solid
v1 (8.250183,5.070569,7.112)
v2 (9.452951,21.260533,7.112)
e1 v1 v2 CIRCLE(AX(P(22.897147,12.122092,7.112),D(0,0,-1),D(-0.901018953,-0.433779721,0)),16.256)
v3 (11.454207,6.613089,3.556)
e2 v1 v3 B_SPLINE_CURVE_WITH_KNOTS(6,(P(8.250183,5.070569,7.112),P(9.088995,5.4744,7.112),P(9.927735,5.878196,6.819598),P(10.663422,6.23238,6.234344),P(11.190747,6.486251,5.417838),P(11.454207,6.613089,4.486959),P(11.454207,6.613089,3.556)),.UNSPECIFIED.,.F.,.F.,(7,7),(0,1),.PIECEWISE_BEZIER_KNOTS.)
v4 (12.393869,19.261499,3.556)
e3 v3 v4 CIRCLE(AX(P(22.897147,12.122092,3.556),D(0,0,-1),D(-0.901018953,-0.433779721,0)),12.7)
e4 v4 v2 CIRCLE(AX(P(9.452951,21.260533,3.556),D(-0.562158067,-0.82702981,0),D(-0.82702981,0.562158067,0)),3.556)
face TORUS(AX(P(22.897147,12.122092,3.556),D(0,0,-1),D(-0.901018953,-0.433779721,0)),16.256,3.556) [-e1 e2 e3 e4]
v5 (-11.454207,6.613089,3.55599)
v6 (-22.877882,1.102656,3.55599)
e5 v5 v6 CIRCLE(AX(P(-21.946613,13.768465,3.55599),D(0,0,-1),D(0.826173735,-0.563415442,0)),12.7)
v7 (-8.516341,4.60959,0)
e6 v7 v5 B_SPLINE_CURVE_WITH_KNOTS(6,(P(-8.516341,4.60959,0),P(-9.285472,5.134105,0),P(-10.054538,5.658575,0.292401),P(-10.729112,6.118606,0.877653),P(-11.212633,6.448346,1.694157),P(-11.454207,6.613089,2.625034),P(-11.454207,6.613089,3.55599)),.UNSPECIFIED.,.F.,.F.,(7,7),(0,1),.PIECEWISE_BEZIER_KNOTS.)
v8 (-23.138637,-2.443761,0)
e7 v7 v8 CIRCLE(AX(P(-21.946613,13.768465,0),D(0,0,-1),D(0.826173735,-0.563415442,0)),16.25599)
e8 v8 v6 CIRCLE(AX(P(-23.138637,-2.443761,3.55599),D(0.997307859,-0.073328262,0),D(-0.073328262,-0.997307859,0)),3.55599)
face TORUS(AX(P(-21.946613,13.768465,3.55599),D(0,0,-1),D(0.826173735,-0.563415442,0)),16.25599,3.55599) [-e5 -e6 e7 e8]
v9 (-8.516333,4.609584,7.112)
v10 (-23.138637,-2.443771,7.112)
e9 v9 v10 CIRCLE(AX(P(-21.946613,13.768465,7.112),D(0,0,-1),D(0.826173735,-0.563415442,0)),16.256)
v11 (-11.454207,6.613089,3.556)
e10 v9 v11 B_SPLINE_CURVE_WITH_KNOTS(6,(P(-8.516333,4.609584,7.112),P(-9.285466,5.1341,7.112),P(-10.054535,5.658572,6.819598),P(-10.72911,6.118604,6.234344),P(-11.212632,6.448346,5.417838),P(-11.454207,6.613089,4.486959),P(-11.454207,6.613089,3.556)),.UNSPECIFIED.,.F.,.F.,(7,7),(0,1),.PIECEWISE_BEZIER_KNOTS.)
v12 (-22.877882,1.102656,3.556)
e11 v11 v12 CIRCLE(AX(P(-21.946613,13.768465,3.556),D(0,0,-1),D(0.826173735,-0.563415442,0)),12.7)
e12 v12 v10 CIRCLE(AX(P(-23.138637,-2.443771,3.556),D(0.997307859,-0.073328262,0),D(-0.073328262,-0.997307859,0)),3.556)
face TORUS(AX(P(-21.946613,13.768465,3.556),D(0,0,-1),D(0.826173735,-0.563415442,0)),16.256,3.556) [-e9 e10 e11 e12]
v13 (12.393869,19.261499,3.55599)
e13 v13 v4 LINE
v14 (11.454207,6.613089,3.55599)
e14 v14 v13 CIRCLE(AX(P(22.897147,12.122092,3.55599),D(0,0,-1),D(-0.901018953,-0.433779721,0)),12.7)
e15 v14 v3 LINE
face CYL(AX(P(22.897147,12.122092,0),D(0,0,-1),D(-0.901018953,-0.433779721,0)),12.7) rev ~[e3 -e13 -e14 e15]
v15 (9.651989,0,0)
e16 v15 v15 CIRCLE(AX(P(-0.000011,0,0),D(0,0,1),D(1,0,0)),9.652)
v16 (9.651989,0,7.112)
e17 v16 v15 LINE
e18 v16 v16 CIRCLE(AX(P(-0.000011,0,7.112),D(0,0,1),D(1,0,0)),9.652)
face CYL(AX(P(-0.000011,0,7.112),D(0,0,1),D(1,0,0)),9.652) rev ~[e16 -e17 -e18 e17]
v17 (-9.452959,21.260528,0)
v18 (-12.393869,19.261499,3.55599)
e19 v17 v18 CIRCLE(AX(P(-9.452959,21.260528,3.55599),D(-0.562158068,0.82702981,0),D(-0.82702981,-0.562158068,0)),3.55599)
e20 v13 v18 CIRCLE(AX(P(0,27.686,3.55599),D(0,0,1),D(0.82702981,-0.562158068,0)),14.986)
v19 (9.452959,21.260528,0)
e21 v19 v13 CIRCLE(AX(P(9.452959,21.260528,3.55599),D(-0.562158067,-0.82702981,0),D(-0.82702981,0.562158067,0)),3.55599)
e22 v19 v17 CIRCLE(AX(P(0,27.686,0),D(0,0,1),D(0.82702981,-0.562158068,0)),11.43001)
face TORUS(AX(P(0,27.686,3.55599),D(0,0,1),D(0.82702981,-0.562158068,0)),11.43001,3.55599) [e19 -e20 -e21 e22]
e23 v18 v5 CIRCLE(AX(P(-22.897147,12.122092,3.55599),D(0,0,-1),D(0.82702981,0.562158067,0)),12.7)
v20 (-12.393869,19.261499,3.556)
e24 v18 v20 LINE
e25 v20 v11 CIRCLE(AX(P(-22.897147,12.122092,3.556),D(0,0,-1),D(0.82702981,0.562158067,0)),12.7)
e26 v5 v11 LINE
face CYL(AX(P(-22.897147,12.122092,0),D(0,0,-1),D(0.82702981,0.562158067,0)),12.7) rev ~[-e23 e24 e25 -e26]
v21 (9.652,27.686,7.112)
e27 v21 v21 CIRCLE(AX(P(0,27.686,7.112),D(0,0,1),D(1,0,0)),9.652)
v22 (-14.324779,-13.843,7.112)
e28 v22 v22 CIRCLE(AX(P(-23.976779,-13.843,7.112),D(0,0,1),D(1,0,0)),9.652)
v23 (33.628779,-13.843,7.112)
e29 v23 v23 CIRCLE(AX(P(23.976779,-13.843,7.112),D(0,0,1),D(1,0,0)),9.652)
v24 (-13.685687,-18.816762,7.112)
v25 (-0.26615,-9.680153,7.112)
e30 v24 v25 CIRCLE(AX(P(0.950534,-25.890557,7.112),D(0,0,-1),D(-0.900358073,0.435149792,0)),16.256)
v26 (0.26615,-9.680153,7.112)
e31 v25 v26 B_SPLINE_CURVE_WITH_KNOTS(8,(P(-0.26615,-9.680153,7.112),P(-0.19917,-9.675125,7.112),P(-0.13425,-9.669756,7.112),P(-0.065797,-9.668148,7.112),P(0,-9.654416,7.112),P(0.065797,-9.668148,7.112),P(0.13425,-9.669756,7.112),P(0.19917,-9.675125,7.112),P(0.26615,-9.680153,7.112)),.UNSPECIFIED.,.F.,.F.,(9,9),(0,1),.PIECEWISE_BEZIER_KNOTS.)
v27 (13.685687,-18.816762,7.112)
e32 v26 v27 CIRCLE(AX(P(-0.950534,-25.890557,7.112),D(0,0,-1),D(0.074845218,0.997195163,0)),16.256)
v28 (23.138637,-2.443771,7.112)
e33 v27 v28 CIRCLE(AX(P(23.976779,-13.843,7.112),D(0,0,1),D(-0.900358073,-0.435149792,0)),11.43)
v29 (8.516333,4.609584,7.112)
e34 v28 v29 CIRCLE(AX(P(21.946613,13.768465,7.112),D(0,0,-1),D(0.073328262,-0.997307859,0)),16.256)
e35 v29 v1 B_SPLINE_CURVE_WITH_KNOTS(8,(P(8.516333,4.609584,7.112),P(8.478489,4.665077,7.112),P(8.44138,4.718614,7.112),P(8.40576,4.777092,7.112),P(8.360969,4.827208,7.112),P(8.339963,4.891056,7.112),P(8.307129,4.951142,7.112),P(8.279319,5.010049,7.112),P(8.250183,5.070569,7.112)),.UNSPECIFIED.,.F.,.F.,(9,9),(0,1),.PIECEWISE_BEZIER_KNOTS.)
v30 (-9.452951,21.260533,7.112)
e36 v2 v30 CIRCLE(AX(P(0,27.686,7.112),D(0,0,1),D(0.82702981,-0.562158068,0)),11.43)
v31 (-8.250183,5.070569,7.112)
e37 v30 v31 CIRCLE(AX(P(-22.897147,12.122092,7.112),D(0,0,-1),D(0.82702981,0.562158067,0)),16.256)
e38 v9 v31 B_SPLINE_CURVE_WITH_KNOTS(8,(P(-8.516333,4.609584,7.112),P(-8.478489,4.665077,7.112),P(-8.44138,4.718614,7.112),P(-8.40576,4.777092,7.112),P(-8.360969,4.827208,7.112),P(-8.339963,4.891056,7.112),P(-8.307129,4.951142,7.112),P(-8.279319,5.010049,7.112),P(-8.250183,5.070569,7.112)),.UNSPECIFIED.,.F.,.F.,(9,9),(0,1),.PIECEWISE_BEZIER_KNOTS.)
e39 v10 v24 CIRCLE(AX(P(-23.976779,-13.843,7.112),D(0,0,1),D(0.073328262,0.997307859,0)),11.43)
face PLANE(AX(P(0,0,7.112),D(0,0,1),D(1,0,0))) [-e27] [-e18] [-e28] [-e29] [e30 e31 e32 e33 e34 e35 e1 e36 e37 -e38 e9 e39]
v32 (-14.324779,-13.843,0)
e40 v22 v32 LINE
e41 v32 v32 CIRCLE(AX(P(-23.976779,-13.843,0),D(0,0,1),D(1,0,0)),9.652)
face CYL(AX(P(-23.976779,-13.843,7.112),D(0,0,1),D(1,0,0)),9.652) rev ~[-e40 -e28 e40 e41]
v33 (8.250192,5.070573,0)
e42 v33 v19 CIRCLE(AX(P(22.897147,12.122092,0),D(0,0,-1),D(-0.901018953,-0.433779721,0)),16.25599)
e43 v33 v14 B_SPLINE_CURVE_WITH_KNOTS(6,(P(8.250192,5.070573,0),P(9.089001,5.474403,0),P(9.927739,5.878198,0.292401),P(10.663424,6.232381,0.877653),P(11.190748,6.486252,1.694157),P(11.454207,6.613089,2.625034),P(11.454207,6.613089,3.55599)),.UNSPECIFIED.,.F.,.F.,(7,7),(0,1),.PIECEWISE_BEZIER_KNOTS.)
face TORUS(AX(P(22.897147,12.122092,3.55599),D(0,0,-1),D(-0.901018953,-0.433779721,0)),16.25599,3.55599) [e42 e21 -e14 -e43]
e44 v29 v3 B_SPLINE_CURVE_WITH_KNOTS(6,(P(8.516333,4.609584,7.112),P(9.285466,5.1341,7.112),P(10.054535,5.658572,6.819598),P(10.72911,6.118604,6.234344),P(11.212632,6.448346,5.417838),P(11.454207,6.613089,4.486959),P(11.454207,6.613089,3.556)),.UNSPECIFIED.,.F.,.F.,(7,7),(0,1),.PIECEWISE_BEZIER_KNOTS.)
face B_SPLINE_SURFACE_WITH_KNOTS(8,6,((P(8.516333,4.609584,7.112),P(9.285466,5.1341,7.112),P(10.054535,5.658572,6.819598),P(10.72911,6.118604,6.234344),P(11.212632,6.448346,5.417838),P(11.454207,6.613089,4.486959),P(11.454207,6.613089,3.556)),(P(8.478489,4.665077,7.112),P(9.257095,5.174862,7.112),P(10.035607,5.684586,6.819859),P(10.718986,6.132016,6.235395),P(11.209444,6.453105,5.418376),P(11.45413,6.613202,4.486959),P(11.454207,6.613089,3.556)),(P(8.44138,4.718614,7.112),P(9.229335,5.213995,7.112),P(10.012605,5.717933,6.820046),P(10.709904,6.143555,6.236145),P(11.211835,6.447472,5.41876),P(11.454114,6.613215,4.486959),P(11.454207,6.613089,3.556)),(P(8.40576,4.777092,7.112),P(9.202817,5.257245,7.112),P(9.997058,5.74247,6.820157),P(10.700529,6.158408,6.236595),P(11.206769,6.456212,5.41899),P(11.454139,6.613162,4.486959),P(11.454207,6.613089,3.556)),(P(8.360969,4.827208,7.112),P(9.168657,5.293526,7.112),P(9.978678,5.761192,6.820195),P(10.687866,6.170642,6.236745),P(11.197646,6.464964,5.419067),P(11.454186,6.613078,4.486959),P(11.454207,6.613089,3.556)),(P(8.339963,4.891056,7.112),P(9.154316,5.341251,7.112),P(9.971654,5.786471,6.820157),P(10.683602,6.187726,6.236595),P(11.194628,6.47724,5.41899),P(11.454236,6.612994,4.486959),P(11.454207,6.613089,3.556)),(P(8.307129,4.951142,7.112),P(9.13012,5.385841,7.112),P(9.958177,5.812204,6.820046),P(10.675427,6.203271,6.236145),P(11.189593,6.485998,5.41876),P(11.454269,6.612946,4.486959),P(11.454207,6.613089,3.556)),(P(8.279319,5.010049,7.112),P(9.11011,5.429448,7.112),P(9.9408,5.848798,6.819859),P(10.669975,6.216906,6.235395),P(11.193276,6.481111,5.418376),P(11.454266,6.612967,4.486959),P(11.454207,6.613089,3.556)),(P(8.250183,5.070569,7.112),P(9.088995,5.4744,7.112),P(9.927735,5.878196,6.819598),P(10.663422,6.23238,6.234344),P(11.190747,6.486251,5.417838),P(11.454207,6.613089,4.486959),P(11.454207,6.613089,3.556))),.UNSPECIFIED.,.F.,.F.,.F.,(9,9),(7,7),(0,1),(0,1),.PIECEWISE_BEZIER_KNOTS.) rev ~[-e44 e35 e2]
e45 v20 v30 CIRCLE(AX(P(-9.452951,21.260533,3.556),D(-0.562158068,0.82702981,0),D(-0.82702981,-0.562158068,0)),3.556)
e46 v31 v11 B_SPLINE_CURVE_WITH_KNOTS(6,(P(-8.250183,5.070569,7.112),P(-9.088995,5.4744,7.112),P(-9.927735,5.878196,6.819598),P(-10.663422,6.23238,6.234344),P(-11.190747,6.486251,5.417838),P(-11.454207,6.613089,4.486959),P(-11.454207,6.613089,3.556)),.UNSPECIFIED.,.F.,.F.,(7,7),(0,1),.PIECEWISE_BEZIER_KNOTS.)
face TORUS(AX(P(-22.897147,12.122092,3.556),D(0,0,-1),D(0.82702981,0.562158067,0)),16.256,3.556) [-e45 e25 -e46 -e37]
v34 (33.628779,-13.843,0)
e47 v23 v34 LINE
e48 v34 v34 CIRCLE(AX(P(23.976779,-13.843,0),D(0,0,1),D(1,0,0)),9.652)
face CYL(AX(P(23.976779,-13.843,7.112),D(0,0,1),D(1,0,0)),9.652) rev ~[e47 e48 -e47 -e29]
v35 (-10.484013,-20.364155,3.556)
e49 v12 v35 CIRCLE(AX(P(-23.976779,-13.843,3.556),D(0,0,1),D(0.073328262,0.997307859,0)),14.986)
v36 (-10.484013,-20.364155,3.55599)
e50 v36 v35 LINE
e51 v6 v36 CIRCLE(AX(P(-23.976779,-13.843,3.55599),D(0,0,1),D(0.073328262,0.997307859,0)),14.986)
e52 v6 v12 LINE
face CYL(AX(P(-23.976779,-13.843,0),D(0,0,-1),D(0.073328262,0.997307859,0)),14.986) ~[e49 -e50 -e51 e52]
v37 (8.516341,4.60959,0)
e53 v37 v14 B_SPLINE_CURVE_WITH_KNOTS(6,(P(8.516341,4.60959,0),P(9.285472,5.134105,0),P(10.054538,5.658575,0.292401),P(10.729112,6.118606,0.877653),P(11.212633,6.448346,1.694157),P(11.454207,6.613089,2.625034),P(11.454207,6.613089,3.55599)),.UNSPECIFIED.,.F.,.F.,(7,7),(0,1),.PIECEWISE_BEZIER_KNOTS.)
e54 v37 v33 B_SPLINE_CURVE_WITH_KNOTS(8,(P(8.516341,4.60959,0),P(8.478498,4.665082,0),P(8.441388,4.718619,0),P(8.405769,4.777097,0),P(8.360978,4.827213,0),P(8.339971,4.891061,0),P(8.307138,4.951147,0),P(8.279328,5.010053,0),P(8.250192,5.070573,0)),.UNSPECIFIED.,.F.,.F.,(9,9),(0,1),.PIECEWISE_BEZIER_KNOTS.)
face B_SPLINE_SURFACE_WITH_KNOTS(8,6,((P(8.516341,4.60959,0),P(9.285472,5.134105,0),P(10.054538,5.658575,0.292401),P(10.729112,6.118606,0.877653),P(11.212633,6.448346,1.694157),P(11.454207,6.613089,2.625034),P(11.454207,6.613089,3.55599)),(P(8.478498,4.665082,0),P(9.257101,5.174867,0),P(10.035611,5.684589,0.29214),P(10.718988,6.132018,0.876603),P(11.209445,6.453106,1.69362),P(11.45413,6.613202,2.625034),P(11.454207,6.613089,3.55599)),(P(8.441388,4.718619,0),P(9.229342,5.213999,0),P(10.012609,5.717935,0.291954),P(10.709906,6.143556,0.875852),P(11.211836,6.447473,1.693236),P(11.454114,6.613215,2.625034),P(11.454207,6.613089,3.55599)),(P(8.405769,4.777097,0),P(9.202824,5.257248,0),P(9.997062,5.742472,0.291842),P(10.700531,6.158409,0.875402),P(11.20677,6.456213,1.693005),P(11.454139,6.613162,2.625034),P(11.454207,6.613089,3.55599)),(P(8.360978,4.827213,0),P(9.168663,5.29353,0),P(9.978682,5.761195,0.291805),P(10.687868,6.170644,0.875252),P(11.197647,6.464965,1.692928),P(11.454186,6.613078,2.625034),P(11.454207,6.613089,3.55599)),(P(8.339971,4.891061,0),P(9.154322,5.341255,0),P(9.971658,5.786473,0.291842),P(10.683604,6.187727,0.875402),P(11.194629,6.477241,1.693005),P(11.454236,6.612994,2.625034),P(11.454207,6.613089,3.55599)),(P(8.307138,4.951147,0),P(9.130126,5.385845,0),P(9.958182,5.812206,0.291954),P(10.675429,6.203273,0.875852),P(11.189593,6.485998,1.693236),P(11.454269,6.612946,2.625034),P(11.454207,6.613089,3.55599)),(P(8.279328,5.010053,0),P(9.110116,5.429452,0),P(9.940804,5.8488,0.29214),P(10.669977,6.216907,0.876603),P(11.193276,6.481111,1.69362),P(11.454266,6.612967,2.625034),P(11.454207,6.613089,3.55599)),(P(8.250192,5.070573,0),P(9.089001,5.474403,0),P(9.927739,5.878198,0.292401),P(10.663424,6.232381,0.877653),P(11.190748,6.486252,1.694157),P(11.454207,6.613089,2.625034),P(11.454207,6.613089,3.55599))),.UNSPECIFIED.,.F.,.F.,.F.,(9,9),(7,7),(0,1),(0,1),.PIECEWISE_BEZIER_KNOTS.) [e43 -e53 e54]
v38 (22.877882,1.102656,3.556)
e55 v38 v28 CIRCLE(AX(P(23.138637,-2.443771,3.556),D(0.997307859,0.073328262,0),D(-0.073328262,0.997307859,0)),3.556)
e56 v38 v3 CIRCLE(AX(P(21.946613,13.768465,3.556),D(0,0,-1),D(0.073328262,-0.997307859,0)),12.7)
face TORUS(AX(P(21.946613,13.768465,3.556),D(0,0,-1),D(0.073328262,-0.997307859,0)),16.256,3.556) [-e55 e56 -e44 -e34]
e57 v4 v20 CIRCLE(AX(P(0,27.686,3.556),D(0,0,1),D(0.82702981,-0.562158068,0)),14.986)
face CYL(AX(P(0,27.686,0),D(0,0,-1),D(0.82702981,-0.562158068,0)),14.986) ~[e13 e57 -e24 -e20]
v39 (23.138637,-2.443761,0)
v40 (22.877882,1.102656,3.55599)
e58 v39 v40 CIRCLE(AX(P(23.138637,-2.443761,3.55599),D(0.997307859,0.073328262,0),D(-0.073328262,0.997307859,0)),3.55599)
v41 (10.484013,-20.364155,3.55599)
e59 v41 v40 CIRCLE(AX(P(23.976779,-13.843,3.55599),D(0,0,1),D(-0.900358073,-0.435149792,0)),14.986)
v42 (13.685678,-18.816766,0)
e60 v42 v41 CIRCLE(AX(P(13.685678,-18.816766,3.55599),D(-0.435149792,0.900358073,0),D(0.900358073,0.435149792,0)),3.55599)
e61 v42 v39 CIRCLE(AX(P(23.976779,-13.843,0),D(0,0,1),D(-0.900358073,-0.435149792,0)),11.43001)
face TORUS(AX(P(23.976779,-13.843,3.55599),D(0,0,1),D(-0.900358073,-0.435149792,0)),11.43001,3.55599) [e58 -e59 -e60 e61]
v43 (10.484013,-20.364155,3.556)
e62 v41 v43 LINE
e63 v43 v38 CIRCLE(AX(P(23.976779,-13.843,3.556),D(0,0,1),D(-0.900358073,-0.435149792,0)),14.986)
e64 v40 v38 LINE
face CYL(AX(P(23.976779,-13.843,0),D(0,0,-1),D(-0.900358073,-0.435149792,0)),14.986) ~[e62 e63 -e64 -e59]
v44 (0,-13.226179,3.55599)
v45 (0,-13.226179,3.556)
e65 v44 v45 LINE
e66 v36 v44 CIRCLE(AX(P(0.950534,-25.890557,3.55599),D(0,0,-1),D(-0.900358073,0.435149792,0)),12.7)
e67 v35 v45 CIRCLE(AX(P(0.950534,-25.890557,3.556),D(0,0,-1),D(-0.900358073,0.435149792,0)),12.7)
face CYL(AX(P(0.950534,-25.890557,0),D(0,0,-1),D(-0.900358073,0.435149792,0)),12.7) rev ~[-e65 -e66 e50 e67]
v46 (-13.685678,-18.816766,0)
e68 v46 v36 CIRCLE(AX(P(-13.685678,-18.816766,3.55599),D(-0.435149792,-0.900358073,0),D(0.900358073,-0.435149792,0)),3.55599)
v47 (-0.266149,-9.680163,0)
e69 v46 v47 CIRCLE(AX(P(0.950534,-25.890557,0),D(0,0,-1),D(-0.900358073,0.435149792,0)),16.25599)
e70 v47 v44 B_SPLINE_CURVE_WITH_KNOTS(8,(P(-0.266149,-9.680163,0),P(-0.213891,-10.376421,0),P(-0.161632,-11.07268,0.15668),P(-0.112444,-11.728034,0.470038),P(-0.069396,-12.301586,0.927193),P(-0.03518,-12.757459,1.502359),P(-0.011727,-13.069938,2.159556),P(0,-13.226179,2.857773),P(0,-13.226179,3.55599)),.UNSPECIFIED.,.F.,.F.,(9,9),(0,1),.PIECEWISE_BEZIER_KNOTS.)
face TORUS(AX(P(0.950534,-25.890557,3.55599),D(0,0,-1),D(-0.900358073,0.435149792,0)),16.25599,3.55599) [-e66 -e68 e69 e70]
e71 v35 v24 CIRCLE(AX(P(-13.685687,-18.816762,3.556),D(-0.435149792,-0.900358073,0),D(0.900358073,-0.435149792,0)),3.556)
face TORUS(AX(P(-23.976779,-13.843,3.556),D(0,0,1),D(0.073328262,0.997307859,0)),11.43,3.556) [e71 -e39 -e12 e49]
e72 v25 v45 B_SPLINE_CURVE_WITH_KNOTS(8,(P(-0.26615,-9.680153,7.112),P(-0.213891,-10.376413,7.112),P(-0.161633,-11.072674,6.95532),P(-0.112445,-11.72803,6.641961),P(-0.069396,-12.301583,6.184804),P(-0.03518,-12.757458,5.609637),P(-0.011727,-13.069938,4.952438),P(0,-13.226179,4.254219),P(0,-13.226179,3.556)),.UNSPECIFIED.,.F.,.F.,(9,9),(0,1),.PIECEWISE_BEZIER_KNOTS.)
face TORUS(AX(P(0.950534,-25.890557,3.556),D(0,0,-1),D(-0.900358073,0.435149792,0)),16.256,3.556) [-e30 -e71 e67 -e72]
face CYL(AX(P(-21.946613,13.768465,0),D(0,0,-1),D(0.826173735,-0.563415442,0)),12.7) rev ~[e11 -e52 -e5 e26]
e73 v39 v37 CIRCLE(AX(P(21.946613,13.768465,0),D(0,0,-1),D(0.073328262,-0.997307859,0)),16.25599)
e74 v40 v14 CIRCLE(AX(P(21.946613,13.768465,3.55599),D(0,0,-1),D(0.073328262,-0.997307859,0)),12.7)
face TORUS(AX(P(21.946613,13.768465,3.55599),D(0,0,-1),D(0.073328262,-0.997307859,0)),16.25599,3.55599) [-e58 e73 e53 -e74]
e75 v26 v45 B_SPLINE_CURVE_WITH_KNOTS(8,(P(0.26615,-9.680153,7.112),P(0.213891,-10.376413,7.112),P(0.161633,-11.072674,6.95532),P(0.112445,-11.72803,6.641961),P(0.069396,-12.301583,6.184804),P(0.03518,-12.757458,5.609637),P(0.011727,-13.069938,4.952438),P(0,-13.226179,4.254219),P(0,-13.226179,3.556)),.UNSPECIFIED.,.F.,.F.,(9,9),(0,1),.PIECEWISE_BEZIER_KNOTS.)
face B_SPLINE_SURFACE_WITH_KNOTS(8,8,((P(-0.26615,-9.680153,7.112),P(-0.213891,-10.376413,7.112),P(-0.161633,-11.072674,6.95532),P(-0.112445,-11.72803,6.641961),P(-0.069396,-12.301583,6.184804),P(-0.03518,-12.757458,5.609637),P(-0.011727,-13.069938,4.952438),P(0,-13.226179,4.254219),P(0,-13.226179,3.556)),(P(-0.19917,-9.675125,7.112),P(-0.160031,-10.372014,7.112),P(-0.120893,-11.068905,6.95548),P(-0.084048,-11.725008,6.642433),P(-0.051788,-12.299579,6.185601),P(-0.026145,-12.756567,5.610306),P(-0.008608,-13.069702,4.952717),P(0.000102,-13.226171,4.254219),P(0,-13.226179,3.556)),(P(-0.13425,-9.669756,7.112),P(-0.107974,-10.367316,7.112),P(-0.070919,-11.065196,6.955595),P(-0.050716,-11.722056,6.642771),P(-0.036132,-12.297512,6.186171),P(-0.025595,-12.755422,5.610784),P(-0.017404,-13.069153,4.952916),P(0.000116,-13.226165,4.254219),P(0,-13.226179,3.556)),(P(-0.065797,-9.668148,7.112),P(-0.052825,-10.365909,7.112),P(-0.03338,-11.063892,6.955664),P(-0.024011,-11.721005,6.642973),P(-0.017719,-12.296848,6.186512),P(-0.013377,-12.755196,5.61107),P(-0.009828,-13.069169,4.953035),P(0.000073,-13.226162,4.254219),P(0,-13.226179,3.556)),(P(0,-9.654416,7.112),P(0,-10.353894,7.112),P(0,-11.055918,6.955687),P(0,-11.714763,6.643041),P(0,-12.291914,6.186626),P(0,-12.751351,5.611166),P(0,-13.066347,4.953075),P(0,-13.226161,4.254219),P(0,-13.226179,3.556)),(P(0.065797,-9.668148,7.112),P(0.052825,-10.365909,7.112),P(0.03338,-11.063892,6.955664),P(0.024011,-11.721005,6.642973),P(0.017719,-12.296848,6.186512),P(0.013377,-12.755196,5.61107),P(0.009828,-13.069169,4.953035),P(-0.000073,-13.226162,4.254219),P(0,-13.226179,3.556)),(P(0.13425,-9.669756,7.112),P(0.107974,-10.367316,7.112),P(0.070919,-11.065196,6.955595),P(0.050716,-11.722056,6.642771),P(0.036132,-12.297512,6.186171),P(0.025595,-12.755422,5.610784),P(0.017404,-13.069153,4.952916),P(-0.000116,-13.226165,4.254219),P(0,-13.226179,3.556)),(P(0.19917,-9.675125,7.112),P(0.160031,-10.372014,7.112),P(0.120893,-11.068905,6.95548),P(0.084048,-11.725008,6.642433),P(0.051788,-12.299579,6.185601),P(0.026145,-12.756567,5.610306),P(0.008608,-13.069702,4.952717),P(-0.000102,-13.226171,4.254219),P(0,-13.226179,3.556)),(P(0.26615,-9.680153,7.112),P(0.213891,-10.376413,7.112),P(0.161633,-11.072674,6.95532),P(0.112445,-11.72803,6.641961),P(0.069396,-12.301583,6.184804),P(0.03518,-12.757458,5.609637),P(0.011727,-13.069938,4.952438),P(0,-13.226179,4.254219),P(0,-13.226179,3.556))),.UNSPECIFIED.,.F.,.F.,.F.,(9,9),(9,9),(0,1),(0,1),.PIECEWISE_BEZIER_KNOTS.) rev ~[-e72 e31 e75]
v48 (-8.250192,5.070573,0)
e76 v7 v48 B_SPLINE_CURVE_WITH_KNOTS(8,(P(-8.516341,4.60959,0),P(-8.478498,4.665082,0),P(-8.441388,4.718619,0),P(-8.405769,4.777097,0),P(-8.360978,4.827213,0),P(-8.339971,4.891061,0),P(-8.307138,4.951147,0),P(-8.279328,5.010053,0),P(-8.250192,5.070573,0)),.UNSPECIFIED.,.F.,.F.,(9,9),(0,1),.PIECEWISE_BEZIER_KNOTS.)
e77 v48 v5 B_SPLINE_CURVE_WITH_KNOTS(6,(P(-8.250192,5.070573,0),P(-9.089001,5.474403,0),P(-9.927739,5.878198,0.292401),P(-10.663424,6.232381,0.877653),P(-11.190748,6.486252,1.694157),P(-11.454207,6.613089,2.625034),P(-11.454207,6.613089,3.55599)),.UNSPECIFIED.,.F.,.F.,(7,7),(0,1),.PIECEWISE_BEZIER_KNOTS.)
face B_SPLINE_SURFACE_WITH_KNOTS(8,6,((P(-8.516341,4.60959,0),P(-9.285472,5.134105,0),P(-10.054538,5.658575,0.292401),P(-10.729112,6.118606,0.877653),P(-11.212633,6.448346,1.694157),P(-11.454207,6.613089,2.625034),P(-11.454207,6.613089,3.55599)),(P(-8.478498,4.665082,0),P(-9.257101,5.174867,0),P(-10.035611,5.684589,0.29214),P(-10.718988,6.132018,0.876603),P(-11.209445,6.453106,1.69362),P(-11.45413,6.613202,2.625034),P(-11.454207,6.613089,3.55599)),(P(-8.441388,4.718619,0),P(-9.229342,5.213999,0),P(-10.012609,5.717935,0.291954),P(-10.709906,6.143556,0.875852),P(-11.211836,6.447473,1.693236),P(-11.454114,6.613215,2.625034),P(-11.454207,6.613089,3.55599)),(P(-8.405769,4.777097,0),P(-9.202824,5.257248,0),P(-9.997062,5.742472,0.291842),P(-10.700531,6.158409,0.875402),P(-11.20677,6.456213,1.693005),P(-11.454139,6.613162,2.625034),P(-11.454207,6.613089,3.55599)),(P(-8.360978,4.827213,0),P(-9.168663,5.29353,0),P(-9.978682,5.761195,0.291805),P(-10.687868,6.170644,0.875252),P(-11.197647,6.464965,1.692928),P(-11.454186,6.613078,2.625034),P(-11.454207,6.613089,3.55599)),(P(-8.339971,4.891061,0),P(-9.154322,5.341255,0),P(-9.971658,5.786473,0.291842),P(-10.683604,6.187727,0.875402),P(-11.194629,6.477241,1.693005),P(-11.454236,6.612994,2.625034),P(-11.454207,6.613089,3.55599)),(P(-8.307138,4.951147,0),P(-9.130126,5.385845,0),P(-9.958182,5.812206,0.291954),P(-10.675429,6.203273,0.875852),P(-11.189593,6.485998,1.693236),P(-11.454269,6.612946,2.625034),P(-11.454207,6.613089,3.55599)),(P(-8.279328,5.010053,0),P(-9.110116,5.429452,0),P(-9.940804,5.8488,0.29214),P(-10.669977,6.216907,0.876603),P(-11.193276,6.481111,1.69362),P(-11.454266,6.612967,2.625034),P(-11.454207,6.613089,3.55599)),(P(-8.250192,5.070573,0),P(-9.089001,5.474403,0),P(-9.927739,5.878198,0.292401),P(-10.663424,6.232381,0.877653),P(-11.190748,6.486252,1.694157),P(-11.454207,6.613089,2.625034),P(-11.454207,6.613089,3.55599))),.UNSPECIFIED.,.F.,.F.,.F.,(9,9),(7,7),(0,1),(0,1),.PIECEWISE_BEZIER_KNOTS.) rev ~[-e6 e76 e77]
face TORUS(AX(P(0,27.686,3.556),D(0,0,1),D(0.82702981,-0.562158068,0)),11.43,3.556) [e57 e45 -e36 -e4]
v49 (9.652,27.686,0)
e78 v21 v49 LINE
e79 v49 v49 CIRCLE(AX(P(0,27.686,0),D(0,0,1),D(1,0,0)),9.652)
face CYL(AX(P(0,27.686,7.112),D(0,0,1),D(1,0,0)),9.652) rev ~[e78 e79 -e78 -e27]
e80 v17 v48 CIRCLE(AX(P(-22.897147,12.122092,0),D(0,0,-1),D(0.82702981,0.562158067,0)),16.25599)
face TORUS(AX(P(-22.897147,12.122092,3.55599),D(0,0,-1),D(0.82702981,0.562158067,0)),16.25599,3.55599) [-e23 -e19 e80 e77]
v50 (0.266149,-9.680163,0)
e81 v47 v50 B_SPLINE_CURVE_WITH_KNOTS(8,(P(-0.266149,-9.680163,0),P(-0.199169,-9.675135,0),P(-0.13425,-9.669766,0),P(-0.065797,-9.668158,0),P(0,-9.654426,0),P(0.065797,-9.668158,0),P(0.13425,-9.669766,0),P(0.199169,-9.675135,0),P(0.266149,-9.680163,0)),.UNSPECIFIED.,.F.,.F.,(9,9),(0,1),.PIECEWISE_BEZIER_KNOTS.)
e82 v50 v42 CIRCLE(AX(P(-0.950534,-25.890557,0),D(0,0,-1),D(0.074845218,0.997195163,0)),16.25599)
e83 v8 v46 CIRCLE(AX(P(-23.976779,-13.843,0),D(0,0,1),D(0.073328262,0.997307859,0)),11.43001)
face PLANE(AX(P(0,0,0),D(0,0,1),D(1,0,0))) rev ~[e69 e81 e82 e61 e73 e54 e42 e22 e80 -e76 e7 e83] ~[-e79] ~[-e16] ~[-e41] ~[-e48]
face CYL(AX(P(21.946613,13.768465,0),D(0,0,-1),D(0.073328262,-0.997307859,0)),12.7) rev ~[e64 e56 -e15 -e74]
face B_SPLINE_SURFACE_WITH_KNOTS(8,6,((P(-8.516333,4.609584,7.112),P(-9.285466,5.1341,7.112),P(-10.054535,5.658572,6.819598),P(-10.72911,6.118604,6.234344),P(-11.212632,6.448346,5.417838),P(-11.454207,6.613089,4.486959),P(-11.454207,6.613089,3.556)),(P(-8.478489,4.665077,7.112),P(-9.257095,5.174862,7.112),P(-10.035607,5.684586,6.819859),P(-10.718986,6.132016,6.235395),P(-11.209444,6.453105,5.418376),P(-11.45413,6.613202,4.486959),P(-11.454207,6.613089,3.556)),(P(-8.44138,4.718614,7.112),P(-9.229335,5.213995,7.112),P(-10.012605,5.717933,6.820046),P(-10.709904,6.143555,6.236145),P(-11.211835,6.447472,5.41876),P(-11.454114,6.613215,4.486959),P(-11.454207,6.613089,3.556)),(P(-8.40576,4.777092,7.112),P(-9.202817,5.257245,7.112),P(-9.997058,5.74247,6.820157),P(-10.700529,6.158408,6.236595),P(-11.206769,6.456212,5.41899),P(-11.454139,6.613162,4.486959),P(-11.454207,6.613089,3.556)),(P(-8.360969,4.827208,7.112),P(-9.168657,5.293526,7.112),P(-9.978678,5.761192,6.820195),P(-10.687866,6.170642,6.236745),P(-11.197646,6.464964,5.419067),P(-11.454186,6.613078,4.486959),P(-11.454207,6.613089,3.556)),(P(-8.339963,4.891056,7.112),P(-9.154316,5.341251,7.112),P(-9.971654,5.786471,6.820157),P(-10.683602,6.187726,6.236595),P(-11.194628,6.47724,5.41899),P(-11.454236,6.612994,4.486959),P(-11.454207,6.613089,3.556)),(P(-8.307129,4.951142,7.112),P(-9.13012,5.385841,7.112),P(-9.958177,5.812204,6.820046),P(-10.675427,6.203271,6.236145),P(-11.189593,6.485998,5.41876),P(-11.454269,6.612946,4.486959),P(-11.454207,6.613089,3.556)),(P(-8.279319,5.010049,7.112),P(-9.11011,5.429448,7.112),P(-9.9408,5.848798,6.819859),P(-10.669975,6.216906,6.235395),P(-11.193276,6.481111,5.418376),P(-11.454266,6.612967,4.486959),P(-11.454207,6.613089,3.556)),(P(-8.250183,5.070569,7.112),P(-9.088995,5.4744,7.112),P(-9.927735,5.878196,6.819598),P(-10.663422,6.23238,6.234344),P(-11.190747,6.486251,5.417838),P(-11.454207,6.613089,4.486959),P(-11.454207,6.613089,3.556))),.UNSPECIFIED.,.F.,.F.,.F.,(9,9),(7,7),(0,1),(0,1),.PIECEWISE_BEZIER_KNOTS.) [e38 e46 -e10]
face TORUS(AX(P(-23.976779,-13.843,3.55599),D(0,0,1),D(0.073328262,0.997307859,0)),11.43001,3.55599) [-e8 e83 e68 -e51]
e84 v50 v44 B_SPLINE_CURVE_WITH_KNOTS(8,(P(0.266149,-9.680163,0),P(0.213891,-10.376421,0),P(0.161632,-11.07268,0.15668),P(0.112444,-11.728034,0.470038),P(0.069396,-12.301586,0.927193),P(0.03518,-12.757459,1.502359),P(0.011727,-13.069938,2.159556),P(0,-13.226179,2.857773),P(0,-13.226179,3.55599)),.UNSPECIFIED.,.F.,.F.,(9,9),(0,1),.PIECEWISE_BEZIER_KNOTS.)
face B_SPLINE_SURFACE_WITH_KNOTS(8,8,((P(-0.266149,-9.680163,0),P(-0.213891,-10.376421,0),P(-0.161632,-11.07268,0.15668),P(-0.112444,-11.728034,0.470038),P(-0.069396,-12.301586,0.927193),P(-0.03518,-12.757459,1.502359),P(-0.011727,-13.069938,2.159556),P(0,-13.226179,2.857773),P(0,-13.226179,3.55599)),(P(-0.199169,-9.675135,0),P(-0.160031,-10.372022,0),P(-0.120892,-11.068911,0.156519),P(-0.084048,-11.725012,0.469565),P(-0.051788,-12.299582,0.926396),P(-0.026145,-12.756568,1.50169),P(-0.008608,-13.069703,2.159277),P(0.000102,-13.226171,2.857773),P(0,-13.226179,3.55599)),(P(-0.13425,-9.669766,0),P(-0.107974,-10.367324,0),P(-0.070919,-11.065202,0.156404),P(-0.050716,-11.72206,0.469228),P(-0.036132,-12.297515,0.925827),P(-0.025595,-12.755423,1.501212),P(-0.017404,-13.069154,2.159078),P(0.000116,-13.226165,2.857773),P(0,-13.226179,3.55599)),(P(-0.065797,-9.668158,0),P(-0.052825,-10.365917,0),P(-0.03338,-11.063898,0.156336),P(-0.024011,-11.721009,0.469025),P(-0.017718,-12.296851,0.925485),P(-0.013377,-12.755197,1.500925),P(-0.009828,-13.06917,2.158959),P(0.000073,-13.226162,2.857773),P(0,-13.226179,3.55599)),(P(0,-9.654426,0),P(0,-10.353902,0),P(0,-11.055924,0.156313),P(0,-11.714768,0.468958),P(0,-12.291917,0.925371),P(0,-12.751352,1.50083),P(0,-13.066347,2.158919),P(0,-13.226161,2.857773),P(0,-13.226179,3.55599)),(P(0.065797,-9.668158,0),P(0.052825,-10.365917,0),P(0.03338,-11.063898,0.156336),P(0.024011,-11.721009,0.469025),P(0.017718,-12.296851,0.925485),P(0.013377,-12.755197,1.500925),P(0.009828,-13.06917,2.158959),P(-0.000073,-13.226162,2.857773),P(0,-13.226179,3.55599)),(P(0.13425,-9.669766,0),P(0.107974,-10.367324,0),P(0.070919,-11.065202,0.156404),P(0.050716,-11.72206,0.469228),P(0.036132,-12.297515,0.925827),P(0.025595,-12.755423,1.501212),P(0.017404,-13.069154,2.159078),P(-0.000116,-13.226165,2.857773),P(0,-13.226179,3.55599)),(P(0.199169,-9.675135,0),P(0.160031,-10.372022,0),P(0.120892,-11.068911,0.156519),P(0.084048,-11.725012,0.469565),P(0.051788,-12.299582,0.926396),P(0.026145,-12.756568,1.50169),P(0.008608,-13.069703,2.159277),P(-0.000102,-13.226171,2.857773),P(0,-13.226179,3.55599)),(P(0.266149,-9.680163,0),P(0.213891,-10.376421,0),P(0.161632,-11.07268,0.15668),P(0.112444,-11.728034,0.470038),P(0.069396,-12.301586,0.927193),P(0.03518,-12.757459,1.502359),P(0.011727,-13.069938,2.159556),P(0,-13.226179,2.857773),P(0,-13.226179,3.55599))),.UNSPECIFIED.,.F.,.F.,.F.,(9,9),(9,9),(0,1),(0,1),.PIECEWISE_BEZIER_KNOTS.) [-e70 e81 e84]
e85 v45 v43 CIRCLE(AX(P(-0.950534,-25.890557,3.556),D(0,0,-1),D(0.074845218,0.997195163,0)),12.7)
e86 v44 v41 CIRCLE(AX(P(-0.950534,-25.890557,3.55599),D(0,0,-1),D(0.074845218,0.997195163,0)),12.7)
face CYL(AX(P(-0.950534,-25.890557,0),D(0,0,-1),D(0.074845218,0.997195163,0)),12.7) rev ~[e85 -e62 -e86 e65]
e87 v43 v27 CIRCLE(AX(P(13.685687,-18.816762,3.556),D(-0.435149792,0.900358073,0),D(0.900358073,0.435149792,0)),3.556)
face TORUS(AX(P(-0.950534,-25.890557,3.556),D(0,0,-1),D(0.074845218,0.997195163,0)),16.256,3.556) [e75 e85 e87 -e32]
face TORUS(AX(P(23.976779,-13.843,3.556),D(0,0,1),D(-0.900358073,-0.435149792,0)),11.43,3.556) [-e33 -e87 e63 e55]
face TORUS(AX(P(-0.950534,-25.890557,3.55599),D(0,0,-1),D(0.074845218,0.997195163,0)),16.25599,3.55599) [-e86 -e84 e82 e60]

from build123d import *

# Parameters (mm, degrees)
F1_DEPTH = 7.112
F2_R     = 3.556
F2_R_2   = 3.55599
F3_R     = 9.652
F4_DEPTH = 7.1130001


# Not quite as in the source:
# - a fillet or chamfer is up to 0.001 mm smaller than in the source, because OpenCascade refuses the exact size


with BuildPart() as f1:
    # F0 (on Top) → F1 (new body)
    with BuildSketch(Plane.XY):
        with BuildLine():
            ThreePointArc((11.4542066283, 6.6130892802), (10.2320494736, 13.0629936143), (12.3938687373, 19.2614992004))
            ThreePointArc((12.3938687373, 19.2614992004), (0, 42.672), (-12.3938687373, 19.2614992004))
            ThreePointArc((-12.3938687373, 19.2614992004), (-10.2320494736, 13.0629936143), (-11.4542066283, 6.6130892802))
            ThreePointArc((-11.4542066283, 6.6130892802), (-16.4289090562, 2.3297179697), (-22.8778819912, 1.1026555775))
            ThreePointArc((-22.8778819912, 1.1026555775), (-36.9550360303, -21.336), (-10.4840132539, -20.3641547779))
            ThreePointArc((-10.4840132539, -20.3641547779), (-6.1968595827, -15.392711584), (0, -13.2261785604))
            ThreePointArc((0, -13.2261785604), (6.1968595827, -15.392711584), (10.4840132539, -20.3641547779))
            ThreePointArc((10.4840132539, -20.3641547779), (36.9550360303, -21.336), (22.8778819912, 1.1026555775))
            ThreePointArc((22.8778819912, 1.1026555775), (16.4289090562, 2.3297179697), (11.4542066283, 6.6130892802))
        make_face()
        with BuildLine():
            ThreePointArc((-11.6730555007, 6.1798899083), (-11.5615614887, 6.395444061), (-11.4542066283, 6.6130892802))
            ThreePointArc((-11.4542066283, 6.6130892802), (-11.3193977697, 6.8148839261), (-11.1884694035, 7.0192176492))
            ThreePointArc((-11.1884694035, 7.0192176492), (-11.4384635332, 6.604), (-11.6730555007, 6.1798899083))
        make_face(mode=Mode.SUBTRACT)
        with BuildLine():
            ThreePointArc((0.4845860972, -13.1991075575), (0.242163719, -13.2103279872), (0, -13.2261785604))
            ThreePointArc((0, -13.2261785604), (-0.242163719, -13.2103279872), (-0.4845860972, -13.1991075575))
            ThreePointArc((-0.4845860972, -13.1991075575), (0, -13.208), (0.4845860972, -13.1991075575))
        make_face(mode=Mode.SUBTRACT)
        with BuildLine():
            ThreePointArc((11.1884694035, 7.0192176492), (11.3193977697, 6.8148839261), (11.4542066283, 6.6130892802))
            ThreePointArc((11.4542066283, 6.6130892802), (11.5615614887, 6.395444061), (11.6730555007, 6.1798899083))
            ThreePointArc((11.6730555007, 6.1798899083), (11.4384635332, 6.604), (11.1884694035, 7.0192176492))
        make_face(mode=Mode.SUBTRACT)
        with BuildLine():
            ThreePointArc((-11.1884694035, 7.0192176492), (-11.3193977697, 6.8148839261), (-11.4542066283, 6.6130892802))
            ThreePointArc((-11.4542066283, 6.6130892802), (-11.5615614887, 6.395444061), (-11.6730555007, 6.1798899083))
            ThreePointArc((-11.6730555007, 6.1798899083), (-11.4384635332, 6.604), (-11.1884694035, 7.0192176492))
        make_face()
        with BuildLine():
            ThreePointArc((-0.4845860972, -13.1991075575), (-0.242163719, -13.2103279872), (0, -13.2261785604))
            ThreePointArc((0, -13.2261785604), (0.242163719, -13.2103279872), (0.4845860972, -13.1991075575))
            ThreePointArc((0.4845860972, -13.1991075575), (0, -13.208), (-0.4845860972, -13.1991075575))
        make_face()
        with BuildLine():
            ThreePointArc((11.6730555007, 6.1798899083), (11.5615614887, 6.395444061), (11.4542066283, 6.6130892802))
            ThreePointArc((11.4542066283, 6.6130892802), (11.3193977697, 6.8148839261), (11.1884694035, 7.0192176492))
            ThreePointArc((11.1884694035, 7.0192176492), (11.4384635332, 6.604), (11.6730555007, 6.1798899083))
        make_face()
    extrude(amount=F1_DEPTH)

    # F2 (call 1 of 2: OpenCascade refuses the feature's edges together)
    f2_edges = [f1.edges().sort_by_distance(p)[0] for p in [
        (-6.19686, -15.392712, 7.112),
        (6.19686, -15.392712, 7.112),
        (36.955036, -21.336, 7.112),
        (16.428909, 2.329718, 7.112),
        (10.232049, 13.062994, 7.112),
        (0, 42.672, 7.112),
        (-10.232049, 13.062994, 7.112),
        (-16.428909, 2.329718, 7.112),
        (-36.955036, -21.336, 7.112),
    ]]
    fillet(f2_edges, radius=F2_R)

    # F2#2 (call 2 of 2) (radius 3.556 in the source; OpenCascade refuses exactly that, so slightly less here)
    f2_2_edges = [f1.edges().sort_by_distance(p)[0] for p in [
        (-6.19686, -15.392712, 0),
        (6.19686, -15.392712, 0),
        (36.955036, -21.336, 0),
        (16.428909, 2.329718, 0),
        (10.232049, 13.062994, 0),
        (0, 42.672, 0),
        (-10.232049, 13.062994, 0),
        (-16.428909, 2.329718, 0),
        (-36.955036, -21.336, 0),
    ]]
    fillet(f2_2_edges, radius=F2_R_2)

    # F3 (on face) → F4 (cut, through all)
    with BuildSketch(Plane.XY.offset(7.112)):
        with Locations((-1.06793e-05, 0)):
            Circle(F3_R)
        with Locations((0, 27.686)):
            Circle(F3_R)
        with Locations((-23.9767793292, -13.843)):
            Circle(F3_R)
        with Locations((23.9767793292, -13.843)):
            Circle(F3_R)
    extrude(amount=-F4_DEPTH, mode=Mode.SUBTRACT)


solid = f1.part
